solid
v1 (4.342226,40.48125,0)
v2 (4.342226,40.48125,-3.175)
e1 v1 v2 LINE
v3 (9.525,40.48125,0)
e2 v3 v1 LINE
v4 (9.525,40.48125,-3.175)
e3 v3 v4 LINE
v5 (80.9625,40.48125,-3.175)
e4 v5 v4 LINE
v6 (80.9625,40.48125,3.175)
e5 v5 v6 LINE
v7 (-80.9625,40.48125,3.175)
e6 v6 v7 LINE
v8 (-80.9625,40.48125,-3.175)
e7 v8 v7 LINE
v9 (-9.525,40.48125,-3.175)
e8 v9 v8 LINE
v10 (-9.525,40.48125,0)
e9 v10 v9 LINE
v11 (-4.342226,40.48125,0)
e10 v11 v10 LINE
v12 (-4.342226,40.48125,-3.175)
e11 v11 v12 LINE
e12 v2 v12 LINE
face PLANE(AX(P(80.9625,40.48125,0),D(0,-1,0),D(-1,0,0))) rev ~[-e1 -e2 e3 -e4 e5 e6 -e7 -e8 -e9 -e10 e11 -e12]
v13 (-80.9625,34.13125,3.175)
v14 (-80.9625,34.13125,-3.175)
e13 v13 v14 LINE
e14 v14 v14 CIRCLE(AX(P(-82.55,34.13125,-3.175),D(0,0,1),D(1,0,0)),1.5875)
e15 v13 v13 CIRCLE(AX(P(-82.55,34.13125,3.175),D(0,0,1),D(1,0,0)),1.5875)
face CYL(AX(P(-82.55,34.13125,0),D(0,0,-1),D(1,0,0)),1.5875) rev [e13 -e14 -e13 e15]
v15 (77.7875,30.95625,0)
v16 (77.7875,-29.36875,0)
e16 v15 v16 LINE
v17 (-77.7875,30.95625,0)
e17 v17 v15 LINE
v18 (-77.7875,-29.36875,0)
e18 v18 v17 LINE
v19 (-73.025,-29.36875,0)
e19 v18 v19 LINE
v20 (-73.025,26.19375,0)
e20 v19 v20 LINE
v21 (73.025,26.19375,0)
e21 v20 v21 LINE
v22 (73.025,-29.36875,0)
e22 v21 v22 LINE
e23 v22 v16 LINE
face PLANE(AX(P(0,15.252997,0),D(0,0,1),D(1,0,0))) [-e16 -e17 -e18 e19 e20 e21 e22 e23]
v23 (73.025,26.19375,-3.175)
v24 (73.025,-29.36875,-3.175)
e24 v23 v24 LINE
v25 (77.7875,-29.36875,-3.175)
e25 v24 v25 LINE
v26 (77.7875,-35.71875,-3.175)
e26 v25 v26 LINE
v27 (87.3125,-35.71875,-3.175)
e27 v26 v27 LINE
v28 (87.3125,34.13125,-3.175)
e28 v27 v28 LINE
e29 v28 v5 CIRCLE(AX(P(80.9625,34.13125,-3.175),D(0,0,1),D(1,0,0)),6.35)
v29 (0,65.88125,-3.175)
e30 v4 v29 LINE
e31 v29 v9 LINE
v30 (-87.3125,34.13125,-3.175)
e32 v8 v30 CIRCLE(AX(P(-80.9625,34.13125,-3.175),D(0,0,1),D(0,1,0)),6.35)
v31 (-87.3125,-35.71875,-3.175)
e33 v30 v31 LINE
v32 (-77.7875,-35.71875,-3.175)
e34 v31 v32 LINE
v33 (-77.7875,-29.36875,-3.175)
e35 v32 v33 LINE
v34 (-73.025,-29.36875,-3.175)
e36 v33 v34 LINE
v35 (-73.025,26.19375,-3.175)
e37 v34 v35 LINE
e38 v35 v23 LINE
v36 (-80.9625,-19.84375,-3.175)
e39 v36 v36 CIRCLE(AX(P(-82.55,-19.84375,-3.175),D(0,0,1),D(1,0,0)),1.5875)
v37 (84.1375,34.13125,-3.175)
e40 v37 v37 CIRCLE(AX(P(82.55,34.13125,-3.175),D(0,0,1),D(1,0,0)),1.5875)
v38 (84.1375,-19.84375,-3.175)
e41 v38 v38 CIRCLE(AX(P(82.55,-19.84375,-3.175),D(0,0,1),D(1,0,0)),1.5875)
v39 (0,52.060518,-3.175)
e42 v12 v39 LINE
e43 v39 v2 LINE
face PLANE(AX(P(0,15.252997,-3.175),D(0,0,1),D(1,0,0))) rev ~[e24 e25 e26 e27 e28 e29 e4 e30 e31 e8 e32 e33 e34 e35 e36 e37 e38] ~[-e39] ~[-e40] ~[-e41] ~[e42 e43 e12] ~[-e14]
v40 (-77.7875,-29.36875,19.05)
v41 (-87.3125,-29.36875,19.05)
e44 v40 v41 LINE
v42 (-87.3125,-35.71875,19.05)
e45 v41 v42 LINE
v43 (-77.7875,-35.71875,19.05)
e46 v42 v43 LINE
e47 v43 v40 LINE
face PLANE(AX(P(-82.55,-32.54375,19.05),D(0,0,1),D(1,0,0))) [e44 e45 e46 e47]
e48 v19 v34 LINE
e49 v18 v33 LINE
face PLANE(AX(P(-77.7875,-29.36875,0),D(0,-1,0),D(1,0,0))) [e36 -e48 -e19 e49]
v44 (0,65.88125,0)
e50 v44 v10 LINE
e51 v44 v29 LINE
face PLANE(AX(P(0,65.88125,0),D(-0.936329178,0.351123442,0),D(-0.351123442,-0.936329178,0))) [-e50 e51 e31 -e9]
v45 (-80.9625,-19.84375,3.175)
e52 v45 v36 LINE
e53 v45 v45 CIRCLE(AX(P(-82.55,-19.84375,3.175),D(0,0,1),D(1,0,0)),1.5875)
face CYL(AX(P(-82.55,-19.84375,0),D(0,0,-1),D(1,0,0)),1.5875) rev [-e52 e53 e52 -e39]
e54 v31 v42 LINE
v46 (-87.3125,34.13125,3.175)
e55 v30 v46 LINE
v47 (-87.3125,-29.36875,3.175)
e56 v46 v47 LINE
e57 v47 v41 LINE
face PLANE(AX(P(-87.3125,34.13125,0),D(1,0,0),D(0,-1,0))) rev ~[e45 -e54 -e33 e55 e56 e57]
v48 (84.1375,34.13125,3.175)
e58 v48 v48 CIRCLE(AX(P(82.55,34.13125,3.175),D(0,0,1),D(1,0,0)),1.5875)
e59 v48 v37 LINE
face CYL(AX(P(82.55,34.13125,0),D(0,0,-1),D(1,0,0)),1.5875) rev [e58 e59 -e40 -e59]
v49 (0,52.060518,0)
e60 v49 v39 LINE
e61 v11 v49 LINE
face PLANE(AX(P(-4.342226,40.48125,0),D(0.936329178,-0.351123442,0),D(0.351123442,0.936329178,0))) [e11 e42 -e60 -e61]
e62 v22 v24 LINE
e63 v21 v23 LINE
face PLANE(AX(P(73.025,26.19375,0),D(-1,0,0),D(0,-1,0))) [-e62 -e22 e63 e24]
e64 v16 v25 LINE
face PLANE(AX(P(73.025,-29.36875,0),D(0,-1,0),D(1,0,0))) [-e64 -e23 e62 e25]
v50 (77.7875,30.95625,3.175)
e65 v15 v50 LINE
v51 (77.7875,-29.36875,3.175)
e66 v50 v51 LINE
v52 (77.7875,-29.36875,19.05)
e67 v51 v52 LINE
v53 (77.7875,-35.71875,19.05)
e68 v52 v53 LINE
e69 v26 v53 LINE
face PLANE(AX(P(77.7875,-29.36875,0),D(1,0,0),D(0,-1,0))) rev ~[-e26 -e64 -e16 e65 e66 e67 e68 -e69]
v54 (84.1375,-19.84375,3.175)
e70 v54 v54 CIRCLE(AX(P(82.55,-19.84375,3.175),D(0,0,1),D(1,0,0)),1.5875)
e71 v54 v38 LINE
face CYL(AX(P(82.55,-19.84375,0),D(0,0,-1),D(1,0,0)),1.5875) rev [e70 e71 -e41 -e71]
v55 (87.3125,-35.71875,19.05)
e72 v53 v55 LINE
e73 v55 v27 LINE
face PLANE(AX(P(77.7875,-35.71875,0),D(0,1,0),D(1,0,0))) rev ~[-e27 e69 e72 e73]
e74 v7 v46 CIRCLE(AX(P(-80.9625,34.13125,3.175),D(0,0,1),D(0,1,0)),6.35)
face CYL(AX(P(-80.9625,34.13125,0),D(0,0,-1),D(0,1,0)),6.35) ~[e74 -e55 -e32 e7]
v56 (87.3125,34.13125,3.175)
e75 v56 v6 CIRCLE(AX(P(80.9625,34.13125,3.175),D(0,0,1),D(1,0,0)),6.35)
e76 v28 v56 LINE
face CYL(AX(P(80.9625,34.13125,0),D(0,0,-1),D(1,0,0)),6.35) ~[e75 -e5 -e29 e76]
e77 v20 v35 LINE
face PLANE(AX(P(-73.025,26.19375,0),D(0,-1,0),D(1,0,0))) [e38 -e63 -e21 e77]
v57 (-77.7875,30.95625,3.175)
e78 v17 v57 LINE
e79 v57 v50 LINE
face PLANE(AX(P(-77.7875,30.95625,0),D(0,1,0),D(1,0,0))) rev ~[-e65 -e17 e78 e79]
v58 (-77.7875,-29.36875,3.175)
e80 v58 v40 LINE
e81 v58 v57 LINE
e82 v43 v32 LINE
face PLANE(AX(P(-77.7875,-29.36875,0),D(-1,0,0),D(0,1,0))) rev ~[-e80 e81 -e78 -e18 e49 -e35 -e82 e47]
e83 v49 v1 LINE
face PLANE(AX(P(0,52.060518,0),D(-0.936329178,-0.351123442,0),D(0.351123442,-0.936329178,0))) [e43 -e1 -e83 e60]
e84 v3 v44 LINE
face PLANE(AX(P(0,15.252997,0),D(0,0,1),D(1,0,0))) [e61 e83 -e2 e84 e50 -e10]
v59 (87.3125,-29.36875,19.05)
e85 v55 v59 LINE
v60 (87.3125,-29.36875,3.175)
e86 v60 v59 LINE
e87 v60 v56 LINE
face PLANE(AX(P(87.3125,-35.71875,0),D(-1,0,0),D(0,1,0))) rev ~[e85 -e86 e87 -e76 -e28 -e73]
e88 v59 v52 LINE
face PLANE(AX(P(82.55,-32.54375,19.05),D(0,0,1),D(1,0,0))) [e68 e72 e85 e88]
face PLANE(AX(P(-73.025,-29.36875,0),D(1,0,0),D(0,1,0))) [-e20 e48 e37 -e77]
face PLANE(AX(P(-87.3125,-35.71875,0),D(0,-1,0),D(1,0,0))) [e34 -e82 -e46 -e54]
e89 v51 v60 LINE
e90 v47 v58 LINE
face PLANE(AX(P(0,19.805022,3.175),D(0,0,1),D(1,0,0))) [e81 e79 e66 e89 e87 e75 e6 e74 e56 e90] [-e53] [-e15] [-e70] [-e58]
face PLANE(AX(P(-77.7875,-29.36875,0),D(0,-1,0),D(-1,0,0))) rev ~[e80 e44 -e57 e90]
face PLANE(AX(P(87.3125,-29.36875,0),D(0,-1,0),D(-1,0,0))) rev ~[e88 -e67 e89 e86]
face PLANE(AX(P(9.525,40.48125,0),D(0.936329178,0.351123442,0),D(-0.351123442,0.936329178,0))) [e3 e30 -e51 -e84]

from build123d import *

# Parameters (mm, degrees)
F0_R     = 1.5875
F1_DEPTH = 3.175
F2_DEPTH = 3.175
F3_DEPTH = 19.05


# Not quite as in the source:
# - a feature names something its author has since deleted; it is built from what else it names


with BuildPart() as f1:
    # F0 (on Top) → F1 (new body)
    with BuildSketch(Plane.XY):
        Polygon((-73.025, 26.19375), (73.025, 26.19375), (73.025, -26.19375), (73.025, -29.36875), (77.7875, -29.36875), (77.7875, -26.19375), (77.7875, 30.95625), (-77.7875, 30.95625), (-77.7875, -26.19375), (-77.7875, -29.36875), (-73.025, -29.36875), (-73.025, -26.19375), align=None)
        with BuildLine():
            Line((77.7875, -26.19375), (77.7875, -29.36875))
            Line((77.7875, -29.36875), (87.3125, -29.36875))
            Line((87.3125, -29.36875), (87.3125, -26.19375))
            Line((87.3125, -26.19375), (87.3125, 34.1312500767))
            ThreePointArc((87.3125, 34.1312500767), (85.452628083, 38.621378083), (80.9625000767, 40.48125))
            Line((80.9625000767, 40.48125), (9.525, 40.48125))
            Line((9.525, 40.48125), (7.9375, 40.48125))
            Line((7.9375, 40.48125), (4.3422256552, 40.48125))
            Line((4.3422256552, 40.48125), (-1.5875, 40.48125))
            Line((-1.5875, 40.48125), (-4.3422256552, 40.48125))
            Line((-4.3422256552, 40.48125), (-9.525, 40.48125))
            Line((-9.525, 40.48125), (-80.9625000767, 40.48125))
            ThreePointArc((-80.9625000767, 40.48125), (-85.452628083, 38.621378083), (-87.3125, 34.1312500767))
            Line((-87.3125, 34.1312500767), (-87.3125, -26.19375))
            Line((-87.3125, -26.19375), (-87.3125, -29.36875))
            Line((-87.3125, -29.36875), (-77.7875, -29.36875))
            Line((-77.7875, -29.36875), (-77.7875, -26.19375))
            Line((-77.7875, -26.19375), (-77.7875, 30.95625))
            Line((-77.7875, 30.95625), (77.7875, 30.95625))
            Line((77.7875, 30.95625), (77.7875, -26.19375))
        make_face()
        with Locations((-82.55, -19.84375)):
            Circle(F0_R, mode=Mode.SUBTRACT)
        with Locations((82.55, -19.84375)):
            Circle(F0_R, mode=Mode.SUBTRACT)
        with Locations((-82.55, 34.13125)):
            Circle(F0_R, mode=Mode.SUBTRACT)
        with Locations((82.55, 34.13125)):
            Circle(F0_R, mode=Mode.SUBTRACT)
        Polygon((-77.7875, -32.54375), (-77.7875, -29.36875), (-87.3125, -29.36875), (-87.3125, -32.54375), (-87.3125, -35.71875), (-77.7875, -35.71875), align=None)
        Polygon((87.3125, -29.36875), (77.7875, -29.36875), (77.7875, -32.54375), (77.7875, -35.71875), (87.3125, -35.71875), (87.3125, -32.54375), align=None)
        Polygon((7.9375, 40.48125), (9.525, 40.48125), (0, 65.88125), (-9.525, 40.48125), (-4.3422256552, 40.48125), (0, 52.0605184138), (4.3422256552, 40.48125), align=None)
    extrude(amount=-F1_DEPTH)

    # F0 (on Top) → F2 (join)
    with BuildSketch(Plane.XY):
        with BuildLine():
            Line((77.7875, -26.19375), (77.7875, -29.36875))
            Line((77.7875, -29.36875), (87.3125, -29.36875))
            Line((87.3125, -29.36875), (87.3125, -26.19375))
            Line((87.3125, -26.19375), (87.3125, 34.1312500767))
            ThreePointArc((87.3125, 34.1312500767), (85.452628083, 38.621378083), (80.9625000767, 40.48125))
            Line((80.9625000767, 40.48125), (9.525, 40.48125))
            Line((9.525, 40.48125), (7.9375, 40.48125))
            Line((7.9375, 40.48125), (4.3422256552, 40.48125))
            Line((4.3422256552, 40.48125), (-1.5875, 40.48125))
            Line((-1.5875, 40.48125), (-4.3422256552, 40.48125))
            Line((-4.3422256552, 40.48125), (-9.525, 40.48125))
            Line((-9.525, 40.48125), (-80.9625000767, 40.48125))
            ThreePointArc((-80.9625000767, 40.48125), (-85.452628083, 38.621378083), (-87.3125, 34.1312500767))
            Line((-87.3125, 34.1312500767), (-87.3125, -26.19375))
            Line((-87.3125, -26.19375), (-87.3125, -29.36875))
            Line((-87.3125, -29.36875), (-77.7875, -29.36875))
            Line((-77.7875, -29.36875), (-77.7875, -26.19375))
            Line((-77.7875, -26.19375), (-77.7875, 30.95625))
            Line((-77.7875, 30.95625), (77.7875, 30.95625))
            Line((77.7875, 30.95625), (77.7875, -26.19375))
        make_face()
        with Locations((-82.55, -19.84375)):
            Circle(F0_R, mode=Mode.SUBTRACT)
        with Locations((82.55, -19.84375)):
            Circle(F0_R, mode=Mode.SUBTRACT)
        with Locations((-82.55, 34.13125)):
            Circle(F0_R, mode=Mode.SUBTRACT)
        with Locations((82.55, 34.13125)):
            Circle(F0_R, mode=Mode.SUBTRACT)
    extrude(amount=F2_DEPTH)

    # F0 (on Top) → F3 (join)
    with BuildSketch(Plane.XY):
        Polygon((87.3125, -29.36875), (77.7875, -29.36875), (77.7875, -32.54375), (77.7875, -35.71875), (87.3125, -35.71875), (87.3125, -32.54375), align=None)
        Polygon((-77.7875, -32.54375), (-77.7875, -29.36875), (-87.3125, -29.36875), (-87.3125, -32.54375), (-87.3125, -35.71875), (-77.7875, -35.71875), align=None)
    extrude(amount=F3_DEPTH)


solid = f1.part
